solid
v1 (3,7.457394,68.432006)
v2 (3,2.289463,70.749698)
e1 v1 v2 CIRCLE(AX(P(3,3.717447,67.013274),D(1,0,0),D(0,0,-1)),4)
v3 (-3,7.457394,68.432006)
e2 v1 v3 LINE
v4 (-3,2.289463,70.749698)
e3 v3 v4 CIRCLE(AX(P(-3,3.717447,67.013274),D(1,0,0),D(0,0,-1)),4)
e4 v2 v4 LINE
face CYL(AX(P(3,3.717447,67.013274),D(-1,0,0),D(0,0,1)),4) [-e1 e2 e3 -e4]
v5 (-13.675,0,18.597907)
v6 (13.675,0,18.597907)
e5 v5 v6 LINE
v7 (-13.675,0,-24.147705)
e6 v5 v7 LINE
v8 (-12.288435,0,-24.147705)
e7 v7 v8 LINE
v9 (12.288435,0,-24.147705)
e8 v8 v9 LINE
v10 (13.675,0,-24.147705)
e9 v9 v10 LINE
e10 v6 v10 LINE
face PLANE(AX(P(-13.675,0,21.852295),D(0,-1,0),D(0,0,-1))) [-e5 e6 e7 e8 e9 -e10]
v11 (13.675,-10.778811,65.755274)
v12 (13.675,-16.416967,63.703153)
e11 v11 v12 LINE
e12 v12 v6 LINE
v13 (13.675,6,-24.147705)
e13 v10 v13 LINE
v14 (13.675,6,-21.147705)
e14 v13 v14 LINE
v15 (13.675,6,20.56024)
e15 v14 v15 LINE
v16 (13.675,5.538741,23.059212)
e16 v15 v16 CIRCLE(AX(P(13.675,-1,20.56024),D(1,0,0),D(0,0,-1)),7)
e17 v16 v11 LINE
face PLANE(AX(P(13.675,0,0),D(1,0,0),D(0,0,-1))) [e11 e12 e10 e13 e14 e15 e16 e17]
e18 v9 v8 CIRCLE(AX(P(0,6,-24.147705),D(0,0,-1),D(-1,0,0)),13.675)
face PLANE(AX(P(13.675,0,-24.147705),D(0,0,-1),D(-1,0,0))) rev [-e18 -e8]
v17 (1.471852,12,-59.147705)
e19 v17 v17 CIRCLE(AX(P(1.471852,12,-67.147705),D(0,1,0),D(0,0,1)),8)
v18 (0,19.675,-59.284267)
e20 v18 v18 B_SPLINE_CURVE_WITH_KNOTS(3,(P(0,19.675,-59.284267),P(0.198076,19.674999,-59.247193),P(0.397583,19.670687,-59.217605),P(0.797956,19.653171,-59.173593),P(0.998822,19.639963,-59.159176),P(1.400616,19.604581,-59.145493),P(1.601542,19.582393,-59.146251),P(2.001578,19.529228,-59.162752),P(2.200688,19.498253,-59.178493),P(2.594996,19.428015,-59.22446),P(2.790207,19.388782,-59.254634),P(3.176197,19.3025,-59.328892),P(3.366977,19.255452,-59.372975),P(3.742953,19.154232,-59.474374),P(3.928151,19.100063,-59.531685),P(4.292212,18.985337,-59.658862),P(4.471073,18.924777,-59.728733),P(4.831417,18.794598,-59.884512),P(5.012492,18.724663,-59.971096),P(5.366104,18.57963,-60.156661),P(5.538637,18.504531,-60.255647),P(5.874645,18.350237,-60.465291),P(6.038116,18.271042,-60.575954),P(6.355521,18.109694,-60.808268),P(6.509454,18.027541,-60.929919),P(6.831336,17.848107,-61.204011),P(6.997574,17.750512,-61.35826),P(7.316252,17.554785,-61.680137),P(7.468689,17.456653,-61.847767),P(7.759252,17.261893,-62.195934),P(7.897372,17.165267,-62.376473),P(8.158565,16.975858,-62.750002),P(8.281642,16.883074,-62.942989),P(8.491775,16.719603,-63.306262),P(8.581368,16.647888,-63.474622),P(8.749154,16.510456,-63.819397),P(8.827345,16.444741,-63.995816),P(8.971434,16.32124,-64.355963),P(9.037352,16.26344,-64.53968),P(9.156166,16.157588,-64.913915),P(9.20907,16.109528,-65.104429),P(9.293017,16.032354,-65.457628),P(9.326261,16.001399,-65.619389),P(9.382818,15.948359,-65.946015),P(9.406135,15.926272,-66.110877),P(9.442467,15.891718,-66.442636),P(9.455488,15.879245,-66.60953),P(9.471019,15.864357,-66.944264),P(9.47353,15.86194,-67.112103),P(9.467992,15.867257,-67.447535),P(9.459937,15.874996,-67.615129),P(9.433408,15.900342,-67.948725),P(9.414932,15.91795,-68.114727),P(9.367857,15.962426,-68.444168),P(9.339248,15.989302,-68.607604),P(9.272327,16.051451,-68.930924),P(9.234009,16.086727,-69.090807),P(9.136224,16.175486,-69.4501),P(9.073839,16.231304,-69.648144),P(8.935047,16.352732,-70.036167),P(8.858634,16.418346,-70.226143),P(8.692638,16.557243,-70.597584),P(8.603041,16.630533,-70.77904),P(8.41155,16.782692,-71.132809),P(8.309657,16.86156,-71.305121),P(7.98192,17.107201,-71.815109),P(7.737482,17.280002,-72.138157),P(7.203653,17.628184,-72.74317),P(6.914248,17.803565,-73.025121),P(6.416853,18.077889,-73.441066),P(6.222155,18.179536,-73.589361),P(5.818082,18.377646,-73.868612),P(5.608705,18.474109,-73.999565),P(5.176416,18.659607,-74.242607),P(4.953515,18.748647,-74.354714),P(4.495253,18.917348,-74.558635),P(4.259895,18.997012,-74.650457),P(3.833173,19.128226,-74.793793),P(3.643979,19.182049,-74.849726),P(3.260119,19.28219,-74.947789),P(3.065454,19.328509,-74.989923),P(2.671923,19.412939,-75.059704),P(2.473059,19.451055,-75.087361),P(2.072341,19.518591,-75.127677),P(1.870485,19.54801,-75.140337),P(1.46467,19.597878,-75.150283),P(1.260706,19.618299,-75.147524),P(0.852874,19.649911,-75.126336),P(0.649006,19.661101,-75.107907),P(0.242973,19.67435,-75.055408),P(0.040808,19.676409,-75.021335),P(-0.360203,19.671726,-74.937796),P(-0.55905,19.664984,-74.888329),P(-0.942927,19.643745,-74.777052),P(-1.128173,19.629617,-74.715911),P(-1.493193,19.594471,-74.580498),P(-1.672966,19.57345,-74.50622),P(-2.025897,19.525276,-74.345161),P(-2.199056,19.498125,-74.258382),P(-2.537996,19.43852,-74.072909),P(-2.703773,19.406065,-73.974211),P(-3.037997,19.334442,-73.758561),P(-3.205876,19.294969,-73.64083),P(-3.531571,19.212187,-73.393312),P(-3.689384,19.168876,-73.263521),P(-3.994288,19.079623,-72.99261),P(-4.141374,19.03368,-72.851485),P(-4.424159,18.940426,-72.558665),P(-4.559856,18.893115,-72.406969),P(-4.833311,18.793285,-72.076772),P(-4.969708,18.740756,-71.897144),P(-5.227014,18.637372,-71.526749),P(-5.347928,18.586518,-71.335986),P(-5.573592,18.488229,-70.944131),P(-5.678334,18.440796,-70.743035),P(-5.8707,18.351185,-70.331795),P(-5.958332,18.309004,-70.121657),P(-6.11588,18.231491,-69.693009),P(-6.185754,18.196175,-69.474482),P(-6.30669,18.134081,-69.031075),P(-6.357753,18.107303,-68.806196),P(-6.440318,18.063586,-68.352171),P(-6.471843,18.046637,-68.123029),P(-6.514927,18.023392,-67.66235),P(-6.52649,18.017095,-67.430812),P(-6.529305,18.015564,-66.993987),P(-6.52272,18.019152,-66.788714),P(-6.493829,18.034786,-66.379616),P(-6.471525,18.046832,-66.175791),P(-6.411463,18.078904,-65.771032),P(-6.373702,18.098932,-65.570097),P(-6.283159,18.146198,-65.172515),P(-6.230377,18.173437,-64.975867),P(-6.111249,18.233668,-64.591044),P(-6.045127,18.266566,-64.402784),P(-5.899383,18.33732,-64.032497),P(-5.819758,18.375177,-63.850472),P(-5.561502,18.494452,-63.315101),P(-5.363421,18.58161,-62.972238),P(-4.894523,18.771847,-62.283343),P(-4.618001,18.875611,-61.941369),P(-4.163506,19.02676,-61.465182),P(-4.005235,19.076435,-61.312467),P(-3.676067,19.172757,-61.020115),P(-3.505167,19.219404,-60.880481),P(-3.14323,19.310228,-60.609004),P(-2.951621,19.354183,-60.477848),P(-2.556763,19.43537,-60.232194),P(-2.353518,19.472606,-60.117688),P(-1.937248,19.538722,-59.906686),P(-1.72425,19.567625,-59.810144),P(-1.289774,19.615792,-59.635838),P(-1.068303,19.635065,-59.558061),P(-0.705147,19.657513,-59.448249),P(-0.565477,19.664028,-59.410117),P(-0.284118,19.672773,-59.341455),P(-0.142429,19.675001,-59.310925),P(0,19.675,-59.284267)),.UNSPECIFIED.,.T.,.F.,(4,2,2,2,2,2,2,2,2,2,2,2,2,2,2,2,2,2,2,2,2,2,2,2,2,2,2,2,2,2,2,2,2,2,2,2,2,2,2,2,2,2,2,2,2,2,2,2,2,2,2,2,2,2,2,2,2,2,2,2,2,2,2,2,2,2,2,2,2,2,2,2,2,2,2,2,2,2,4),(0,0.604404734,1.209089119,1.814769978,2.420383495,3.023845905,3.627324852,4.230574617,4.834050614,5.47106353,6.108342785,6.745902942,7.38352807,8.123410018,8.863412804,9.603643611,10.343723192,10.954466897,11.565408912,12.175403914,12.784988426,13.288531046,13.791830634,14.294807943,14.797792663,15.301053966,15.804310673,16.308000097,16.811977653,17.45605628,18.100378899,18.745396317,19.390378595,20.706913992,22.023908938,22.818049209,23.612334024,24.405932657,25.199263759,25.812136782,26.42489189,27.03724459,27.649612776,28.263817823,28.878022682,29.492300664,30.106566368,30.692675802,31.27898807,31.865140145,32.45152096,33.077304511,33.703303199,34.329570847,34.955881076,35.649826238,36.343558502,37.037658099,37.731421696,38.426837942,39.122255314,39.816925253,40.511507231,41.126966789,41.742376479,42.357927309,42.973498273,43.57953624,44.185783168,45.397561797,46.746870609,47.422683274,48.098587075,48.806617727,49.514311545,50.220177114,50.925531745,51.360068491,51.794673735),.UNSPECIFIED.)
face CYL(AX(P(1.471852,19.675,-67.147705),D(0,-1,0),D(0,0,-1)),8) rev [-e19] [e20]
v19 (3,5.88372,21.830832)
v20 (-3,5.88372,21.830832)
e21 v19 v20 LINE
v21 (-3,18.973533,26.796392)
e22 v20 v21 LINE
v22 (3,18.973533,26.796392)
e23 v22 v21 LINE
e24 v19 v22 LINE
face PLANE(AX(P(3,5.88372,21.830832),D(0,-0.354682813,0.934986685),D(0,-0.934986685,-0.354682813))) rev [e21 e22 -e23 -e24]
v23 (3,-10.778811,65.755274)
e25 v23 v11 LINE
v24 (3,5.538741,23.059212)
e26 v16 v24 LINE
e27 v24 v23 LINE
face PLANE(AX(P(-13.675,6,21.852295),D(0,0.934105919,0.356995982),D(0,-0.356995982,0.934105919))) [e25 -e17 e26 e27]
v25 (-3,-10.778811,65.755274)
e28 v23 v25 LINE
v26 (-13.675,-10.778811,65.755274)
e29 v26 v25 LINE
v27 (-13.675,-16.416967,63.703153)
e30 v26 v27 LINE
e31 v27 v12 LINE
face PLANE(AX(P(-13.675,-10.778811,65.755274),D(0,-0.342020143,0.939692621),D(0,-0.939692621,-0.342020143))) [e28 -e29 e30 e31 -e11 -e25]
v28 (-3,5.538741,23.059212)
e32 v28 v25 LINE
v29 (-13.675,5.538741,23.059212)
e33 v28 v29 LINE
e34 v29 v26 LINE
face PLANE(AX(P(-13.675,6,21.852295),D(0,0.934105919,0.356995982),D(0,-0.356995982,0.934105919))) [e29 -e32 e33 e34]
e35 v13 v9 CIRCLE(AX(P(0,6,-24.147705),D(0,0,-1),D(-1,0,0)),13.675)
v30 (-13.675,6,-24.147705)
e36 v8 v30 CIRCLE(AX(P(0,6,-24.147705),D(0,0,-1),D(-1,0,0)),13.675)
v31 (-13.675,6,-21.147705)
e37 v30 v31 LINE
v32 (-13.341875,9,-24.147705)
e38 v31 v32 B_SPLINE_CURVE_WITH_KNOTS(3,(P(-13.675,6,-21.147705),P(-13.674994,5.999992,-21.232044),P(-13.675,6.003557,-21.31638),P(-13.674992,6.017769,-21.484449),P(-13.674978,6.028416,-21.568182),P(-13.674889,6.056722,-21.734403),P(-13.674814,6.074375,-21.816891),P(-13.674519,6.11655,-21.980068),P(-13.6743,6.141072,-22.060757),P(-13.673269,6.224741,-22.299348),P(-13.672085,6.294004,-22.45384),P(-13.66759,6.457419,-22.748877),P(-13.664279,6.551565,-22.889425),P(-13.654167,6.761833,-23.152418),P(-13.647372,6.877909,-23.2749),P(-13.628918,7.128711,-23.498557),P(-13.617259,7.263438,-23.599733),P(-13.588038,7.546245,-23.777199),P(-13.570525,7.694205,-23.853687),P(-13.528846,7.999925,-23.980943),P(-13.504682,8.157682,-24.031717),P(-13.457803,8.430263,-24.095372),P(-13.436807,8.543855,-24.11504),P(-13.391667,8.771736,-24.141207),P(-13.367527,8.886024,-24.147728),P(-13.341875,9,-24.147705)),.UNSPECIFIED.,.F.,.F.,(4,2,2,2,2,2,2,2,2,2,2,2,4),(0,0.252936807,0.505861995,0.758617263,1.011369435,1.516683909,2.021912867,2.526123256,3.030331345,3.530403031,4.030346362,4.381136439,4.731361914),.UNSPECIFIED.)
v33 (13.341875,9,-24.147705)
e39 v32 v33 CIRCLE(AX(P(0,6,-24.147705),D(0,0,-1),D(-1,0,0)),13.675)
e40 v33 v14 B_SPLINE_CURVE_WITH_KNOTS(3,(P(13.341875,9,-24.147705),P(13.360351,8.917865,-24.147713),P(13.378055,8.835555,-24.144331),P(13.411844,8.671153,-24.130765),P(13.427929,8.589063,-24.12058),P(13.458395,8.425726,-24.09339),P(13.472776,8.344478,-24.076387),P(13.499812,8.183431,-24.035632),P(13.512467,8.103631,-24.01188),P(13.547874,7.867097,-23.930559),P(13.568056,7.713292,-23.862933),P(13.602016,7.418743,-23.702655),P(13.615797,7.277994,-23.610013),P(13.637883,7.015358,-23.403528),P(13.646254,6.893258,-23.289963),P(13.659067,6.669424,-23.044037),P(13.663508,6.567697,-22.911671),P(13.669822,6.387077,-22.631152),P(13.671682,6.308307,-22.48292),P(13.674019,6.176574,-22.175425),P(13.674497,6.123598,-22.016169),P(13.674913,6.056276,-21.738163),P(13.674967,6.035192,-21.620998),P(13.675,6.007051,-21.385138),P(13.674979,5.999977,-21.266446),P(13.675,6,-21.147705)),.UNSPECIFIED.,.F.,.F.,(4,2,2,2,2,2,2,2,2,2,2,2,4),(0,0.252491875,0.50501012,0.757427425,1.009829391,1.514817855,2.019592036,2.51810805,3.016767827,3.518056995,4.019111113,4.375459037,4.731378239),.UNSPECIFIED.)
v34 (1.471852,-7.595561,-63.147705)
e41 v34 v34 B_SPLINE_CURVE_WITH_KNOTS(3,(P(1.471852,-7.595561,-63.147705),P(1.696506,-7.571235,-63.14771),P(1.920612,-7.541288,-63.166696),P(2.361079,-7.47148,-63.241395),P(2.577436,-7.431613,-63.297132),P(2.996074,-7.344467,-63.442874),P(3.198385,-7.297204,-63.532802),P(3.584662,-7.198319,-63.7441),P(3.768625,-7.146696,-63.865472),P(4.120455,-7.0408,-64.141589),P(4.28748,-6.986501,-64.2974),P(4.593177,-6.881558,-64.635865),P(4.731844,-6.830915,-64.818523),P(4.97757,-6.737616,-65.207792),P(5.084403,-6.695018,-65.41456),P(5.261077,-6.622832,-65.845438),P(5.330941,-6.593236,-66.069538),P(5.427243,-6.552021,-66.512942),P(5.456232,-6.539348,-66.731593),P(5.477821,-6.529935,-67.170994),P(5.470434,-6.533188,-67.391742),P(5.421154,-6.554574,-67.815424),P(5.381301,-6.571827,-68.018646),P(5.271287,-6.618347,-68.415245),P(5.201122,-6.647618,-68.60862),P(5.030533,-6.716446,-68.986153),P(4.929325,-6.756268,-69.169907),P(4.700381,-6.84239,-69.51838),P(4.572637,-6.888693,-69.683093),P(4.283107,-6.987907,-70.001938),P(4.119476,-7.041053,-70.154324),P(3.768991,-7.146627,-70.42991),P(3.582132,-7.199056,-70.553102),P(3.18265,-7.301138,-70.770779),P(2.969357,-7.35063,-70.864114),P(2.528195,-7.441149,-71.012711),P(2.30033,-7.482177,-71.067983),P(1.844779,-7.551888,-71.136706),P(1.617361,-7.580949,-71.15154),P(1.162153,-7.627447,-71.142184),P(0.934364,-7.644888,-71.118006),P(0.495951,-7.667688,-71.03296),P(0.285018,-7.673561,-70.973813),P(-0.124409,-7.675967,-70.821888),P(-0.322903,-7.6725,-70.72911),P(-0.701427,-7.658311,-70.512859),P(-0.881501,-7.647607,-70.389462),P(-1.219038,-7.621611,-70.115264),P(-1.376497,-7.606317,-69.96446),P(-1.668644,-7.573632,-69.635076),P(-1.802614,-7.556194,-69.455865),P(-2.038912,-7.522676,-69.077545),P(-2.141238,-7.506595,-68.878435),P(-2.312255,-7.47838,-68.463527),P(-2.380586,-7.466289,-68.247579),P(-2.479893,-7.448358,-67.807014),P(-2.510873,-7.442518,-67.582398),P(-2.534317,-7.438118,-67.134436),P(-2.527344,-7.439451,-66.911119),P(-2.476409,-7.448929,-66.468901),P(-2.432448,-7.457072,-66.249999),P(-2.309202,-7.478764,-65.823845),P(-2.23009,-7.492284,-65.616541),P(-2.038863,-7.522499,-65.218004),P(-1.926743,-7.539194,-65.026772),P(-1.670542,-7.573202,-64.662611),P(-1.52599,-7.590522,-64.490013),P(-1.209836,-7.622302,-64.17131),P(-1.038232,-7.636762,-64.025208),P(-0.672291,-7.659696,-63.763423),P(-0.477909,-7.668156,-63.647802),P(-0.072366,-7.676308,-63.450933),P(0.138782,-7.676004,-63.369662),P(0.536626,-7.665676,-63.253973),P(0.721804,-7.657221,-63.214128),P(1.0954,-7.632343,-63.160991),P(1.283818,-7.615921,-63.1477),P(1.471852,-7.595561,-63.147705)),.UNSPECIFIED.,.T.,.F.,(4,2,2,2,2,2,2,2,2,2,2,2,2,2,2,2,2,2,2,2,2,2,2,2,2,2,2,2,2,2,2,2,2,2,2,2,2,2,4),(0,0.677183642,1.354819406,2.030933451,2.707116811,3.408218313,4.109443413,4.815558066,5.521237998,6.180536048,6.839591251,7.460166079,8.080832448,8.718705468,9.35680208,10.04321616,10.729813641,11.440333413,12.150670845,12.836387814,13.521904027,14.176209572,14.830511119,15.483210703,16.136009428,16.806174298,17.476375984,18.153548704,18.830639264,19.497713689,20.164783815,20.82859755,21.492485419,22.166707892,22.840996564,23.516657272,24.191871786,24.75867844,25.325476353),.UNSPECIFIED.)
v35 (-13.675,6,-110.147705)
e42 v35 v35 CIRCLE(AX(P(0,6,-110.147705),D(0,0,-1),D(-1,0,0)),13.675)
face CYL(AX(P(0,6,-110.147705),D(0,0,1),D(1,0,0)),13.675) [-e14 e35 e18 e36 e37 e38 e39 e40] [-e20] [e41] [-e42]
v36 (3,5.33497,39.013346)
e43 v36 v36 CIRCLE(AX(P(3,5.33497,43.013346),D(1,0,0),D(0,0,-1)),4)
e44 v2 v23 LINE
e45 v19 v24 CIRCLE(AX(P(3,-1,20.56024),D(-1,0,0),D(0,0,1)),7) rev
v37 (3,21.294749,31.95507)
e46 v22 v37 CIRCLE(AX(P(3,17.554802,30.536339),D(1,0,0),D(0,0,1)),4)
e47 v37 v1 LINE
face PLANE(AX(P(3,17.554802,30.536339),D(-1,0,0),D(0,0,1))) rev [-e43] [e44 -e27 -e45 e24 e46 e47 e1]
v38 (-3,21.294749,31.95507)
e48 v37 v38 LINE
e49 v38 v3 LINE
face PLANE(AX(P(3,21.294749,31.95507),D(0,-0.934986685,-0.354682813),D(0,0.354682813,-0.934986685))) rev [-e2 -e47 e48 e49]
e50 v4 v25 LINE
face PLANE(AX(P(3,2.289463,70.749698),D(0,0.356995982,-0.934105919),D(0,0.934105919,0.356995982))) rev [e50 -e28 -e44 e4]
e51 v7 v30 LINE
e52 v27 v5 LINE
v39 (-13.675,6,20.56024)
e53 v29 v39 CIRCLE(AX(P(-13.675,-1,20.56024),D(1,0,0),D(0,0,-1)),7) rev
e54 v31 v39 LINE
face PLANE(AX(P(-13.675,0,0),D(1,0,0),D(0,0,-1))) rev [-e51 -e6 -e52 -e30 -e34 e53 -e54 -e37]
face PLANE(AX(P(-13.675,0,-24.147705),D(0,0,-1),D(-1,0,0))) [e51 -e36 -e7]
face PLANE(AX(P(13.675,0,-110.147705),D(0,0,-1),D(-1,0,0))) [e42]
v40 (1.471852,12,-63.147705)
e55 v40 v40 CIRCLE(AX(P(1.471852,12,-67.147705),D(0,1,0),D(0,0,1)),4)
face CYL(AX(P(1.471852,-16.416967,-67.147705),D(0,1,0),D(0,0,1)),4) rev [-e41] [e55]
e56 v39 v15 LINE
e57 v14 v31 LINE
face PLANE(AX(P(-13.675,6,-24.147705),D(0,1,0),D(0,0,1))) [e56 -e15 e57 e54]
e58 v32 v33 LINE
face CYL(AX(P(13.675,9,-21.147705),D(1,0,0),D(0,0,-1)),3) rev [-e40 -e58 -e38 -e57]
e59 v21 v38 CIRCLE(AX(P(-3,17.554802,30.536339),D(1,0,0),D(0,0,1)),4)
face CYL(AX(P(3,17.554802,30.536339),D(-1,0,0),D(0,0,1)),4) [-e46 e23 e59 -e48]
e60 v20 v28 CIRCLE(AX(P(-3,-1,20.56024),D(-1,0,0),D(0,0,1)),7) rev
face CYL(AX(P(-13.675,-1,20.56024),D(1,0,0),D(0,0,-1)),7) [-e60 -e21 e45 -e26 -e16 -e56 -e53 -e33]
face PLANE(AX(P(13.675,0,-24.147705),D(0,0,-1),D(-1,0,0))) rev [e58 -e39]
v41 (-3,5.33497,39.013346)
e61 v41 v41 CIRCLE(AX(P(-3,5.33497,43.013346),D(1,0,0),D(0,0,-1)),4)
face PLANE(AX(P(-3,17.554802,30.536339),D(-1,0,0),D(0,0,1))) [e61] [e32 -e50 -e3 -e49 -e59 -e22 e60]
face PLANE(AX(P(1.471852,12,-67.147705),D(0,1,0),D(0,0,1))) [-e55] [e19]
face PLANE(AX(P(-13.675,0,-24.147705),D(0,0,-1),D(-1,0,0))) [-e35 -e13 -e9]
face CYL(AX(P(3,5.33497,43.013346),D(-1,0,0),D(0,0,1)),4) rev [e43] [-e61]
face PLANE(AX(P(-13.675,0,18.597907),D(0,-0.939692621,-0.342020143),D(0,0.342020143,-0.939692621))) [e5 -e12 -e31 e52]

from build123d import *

# Parameters (mm, degrees)
SKETCH1_W           = 46
SKETCH1_H           = 6
BOSS_EXTRUDE1_DEPTH = 27.35
BOSS_EXTRUDE2_DEPTH = 27.35
FILLET1_R           = 7
BOSS_EXTRUDE3_DEPTH = 86
FILLET2_R           = 3
SKETCH5_R           = 8
SKETCH5_R_2         = 4
CUT_EXTRUDE1_DEPTH  = 116.185263628
SKETCH6_R           = 4
CUT_EXTRUDE2_DEPTH  = 116.185263741
SKETCH7_R           = 4
CUT_EXTRUDE3_DEPTH  = 116.185263741
SKETCH8_R           = 8
SKETCH8_R_2         = 4
BOSS_EXTRUDE4_DEPTH = 6
SKETCH9_R           = 8
SKETCH9_R_2         = 4
BOSS_EXTRUDE5_DEPTH = 6
SKETCH11_R          = 4
BOSS_EXTRUDE6_DEPTH = 3


with BuildPart() as part:
    # Sketch1 → Boss-Extrude1 (new body)
    with BuildSketch(Plane(origin=(0, 0, 0), x_dir=(0, 0, -1), z_dir=(1, 0, 0))):
        with Locations((1.147704591, 3)):
            Rectangle(SKETCH1_W, SKETCH1_H)
    extrude(amount=-BOSS_EXTRUDE1_DEPTH)

    # Sketch2 → Boss-Extrude2 (add)
    with BuildSketch(Plane(origin=(0, 0, 0), x_dir=(0, 0, -1), z_dir=(1, 0, 0))):
        Polygon((-21.852295409, 6), (-65.755273625, -10.778811155), (-63.703152765, -16.41696688), (-18.597906967, 0), align=None)
    extrude(amount=-BOSS_EXTRUDE2_DEPTH)

    # Fillet1
    fillet1_edges = [part.edges().sort_by_distance(p)[0] for p in [
        (-13.675, 6, 21.852295409),
    ]]
    fillet(fillet1_edges, radius=FILLET1_R)

    # Sketch3 → Boss-Extrude3 (add)
    with BuildSketch(Plane(origin=(0, 0, -24.147704591), x_dir=(-1, 0, 0), z_dir=(0, 0, -1))):
        with BuildLine():
            ThreePointArc((27.35, 6), (13.675, 19.675), (0, 6))
            Line((0, 6), (27.35, 6))
        make_face()
        with BuildLine():
            Line((25.963434603, 0), (1.386565397, 0))
            ThreePointArc((1.386565397, 0), (13.675, -7.675), (25.963434603, 0))
        make_face()
        with BuildLine():
            Line((27.35, 6), (0, 6))
            ThreePointArc((0, 6), (0.351149802, 2.920935061), (1.386565397, 0))
            Line((1.386565397, 0), (25.963434603, 0))
            ThreePointArc((25.963434603, 0), (26.998850198, 2.920935061), (27.35, 6))
        make_face()
    extrude(amount=BOSS_EXTRUDE3_DEPTH)

    # Fillet2
    # the kernel refuses this fillet: 3 mm, written as the material it adds along each edge
    with BuildSketch(Plane(origin=(0, 6, -24.147704591), x_dir=(0, 0, 1), z_dir=(-1, 0, 0))) as fillet2_piece_1_section:
        with BuildLine():
            CenterArc((FILLET2_R, FILLET2_R), FILLET2_R, 180, 90)
            Line((0, FILLET2_R), (0, 0))
            Line((0, 0), (FILLET2_R, 0))
        make_face()
    fillet2_piece_1 = extrude(amount=27.35, mode=Mode.PRIVATE)
    fillet2_piece_1 = fillet2_piece_1 & Plane(origin=(-13.675, 6, -23.467343504), x_dir=(-1, 0, 0), z_dir=(0, 0, 1)) * Cylinder(13.675, 67, mode=Mode.PRIVATE)
    add(fillet2_piece_1)

    # Sketch5 → Cut-Extrude1 (cut, through all)
    with BuildSketch(Plane(origin=(0, 0, 0), x_dir=(1, 0, 0), z_dir=(0, 1, 0))):
        with Locations(Location((-12.203148076, 67.147704591, 0), (0, 0, 259.398243128))):
            Circle(SKETCH5_R)
        with Locations(Location((-12.203148076, 67.147704591, 0), (0, 0, 248.409956221))):
            Circle(SKETCH5_R_2, mode=Mode.SUBTRACT)
    extrude(amount=CUT_EXTRUDE1_DEPTH, mode=Mode.SUBTRACT)

    # Sketch6 → Cut-Extrude2 (cut, through all)
    with BuildSketch(Plane(origin=(0, 0, 0), x_dir=(1, 0, 0), z_dir=(0, 1, 0))):
        with Locations((-12.203148076, 67.147704591)):
            Circle(SKETCH6_R)
    extrude(amount=CUT_EXTRUDE2_DEPTH, mode=Mode.SUBTRACT)

    # Sketch7 → Cut-Extrude3 (cut, through all)
    with BuildSketch(Plane(origin=(0, 0, 0), x_dir=(1, 0, 0), z_dir=(0, 1, 0))):
        with Locations(Location((-12.203148076, 67.147704591, 0), (0, 0, 270))):
            Circle(SKETCH7_R)
    extrude(amount=-CUT_EXTRUDE3_DEPTH, mode=Mode.SUBTRACT)

    # Sketch8 → Boss-Extrude4 (add)
    with BuildSketch(Plane(origin=(0, 0, 0), x_dir=(1, 0, 0), z_dir=(0, 1, 0))):
        with Locations(Location((-12.203148076, 67.147704591, 0), (0, 0, 259.398243128))):
            Circle(SKETCH8_R)
        with Locations(Location((-12.203148076, 67.147704591, 0), (0, 0, 270))):
            Circle(SKETCH8_R_2, mode=Mode.SUBTRACT)
    extrude(amount=BOSS_EXTRUDE4_DEPTH)

    # Sketch9 → Boss-Extrude5 (add)
    with BuildSketch(Plane(origin=(0, 6, 0), x_dir=(1, 0, 0), z_dir=(0, 1, 0))):
        with Locations(Location((-12.203148076, 67.147704591, 0), (0, 0, 259.398243128))):
            Circle(SKETCH9_R)
        with Locations(Location((-12.203148076, 67.147704591, 0), (0, 0, 270))):
            Circle(SKETCH9_R_2, mode=Mode.SUBTRACT)
    extrude(amount=BOSS_EXTRUDE5_DEPTH)


with BuildPart() as part_1:
    # Body-Move/Copy1: moved
    add(part.part.moved(Location((13.675, 0, 0))))

    # Sketch11 → Boss-Extrude6 (add, symmetric)
    with BuildSketch(Plane(origin=(0, 0, 0), x_dir=(0, 0, -1), z_dir=(1, 0, 0))):
        with BuildLine():
            Line((-65.755273625, -10.778811155), (-21.830832444, 5.883719563))
            Line((-21.830832444, 5.883719563), (-26.796391829, 18.97353316))
            ThreePointArc((-26.796391829, 18.97353316), (-28.894991358, 21.202538099), (-31.955069824, 21.294748649))
            Line((-31.955069824, 21.294748649), (-68.432005738, 7.457394118))
            ThreePointArc((-68.432005738, 7.457394118), (-70.663039196, 5.354278937), (-70.749698163, 2.289463448))
            Line((-70.749698163, 2.289463448), (-65.755273625, -10.778811155))
        make_face()
        with Locations((-43.013345846, 5.334970097)):
            Circle(SKETCH11_R, mode=Mode.SUBTRACT)
    extrude(amount=BOSS_EXTRUDE6_DEPTH, both=True)


solid = part_1.part
